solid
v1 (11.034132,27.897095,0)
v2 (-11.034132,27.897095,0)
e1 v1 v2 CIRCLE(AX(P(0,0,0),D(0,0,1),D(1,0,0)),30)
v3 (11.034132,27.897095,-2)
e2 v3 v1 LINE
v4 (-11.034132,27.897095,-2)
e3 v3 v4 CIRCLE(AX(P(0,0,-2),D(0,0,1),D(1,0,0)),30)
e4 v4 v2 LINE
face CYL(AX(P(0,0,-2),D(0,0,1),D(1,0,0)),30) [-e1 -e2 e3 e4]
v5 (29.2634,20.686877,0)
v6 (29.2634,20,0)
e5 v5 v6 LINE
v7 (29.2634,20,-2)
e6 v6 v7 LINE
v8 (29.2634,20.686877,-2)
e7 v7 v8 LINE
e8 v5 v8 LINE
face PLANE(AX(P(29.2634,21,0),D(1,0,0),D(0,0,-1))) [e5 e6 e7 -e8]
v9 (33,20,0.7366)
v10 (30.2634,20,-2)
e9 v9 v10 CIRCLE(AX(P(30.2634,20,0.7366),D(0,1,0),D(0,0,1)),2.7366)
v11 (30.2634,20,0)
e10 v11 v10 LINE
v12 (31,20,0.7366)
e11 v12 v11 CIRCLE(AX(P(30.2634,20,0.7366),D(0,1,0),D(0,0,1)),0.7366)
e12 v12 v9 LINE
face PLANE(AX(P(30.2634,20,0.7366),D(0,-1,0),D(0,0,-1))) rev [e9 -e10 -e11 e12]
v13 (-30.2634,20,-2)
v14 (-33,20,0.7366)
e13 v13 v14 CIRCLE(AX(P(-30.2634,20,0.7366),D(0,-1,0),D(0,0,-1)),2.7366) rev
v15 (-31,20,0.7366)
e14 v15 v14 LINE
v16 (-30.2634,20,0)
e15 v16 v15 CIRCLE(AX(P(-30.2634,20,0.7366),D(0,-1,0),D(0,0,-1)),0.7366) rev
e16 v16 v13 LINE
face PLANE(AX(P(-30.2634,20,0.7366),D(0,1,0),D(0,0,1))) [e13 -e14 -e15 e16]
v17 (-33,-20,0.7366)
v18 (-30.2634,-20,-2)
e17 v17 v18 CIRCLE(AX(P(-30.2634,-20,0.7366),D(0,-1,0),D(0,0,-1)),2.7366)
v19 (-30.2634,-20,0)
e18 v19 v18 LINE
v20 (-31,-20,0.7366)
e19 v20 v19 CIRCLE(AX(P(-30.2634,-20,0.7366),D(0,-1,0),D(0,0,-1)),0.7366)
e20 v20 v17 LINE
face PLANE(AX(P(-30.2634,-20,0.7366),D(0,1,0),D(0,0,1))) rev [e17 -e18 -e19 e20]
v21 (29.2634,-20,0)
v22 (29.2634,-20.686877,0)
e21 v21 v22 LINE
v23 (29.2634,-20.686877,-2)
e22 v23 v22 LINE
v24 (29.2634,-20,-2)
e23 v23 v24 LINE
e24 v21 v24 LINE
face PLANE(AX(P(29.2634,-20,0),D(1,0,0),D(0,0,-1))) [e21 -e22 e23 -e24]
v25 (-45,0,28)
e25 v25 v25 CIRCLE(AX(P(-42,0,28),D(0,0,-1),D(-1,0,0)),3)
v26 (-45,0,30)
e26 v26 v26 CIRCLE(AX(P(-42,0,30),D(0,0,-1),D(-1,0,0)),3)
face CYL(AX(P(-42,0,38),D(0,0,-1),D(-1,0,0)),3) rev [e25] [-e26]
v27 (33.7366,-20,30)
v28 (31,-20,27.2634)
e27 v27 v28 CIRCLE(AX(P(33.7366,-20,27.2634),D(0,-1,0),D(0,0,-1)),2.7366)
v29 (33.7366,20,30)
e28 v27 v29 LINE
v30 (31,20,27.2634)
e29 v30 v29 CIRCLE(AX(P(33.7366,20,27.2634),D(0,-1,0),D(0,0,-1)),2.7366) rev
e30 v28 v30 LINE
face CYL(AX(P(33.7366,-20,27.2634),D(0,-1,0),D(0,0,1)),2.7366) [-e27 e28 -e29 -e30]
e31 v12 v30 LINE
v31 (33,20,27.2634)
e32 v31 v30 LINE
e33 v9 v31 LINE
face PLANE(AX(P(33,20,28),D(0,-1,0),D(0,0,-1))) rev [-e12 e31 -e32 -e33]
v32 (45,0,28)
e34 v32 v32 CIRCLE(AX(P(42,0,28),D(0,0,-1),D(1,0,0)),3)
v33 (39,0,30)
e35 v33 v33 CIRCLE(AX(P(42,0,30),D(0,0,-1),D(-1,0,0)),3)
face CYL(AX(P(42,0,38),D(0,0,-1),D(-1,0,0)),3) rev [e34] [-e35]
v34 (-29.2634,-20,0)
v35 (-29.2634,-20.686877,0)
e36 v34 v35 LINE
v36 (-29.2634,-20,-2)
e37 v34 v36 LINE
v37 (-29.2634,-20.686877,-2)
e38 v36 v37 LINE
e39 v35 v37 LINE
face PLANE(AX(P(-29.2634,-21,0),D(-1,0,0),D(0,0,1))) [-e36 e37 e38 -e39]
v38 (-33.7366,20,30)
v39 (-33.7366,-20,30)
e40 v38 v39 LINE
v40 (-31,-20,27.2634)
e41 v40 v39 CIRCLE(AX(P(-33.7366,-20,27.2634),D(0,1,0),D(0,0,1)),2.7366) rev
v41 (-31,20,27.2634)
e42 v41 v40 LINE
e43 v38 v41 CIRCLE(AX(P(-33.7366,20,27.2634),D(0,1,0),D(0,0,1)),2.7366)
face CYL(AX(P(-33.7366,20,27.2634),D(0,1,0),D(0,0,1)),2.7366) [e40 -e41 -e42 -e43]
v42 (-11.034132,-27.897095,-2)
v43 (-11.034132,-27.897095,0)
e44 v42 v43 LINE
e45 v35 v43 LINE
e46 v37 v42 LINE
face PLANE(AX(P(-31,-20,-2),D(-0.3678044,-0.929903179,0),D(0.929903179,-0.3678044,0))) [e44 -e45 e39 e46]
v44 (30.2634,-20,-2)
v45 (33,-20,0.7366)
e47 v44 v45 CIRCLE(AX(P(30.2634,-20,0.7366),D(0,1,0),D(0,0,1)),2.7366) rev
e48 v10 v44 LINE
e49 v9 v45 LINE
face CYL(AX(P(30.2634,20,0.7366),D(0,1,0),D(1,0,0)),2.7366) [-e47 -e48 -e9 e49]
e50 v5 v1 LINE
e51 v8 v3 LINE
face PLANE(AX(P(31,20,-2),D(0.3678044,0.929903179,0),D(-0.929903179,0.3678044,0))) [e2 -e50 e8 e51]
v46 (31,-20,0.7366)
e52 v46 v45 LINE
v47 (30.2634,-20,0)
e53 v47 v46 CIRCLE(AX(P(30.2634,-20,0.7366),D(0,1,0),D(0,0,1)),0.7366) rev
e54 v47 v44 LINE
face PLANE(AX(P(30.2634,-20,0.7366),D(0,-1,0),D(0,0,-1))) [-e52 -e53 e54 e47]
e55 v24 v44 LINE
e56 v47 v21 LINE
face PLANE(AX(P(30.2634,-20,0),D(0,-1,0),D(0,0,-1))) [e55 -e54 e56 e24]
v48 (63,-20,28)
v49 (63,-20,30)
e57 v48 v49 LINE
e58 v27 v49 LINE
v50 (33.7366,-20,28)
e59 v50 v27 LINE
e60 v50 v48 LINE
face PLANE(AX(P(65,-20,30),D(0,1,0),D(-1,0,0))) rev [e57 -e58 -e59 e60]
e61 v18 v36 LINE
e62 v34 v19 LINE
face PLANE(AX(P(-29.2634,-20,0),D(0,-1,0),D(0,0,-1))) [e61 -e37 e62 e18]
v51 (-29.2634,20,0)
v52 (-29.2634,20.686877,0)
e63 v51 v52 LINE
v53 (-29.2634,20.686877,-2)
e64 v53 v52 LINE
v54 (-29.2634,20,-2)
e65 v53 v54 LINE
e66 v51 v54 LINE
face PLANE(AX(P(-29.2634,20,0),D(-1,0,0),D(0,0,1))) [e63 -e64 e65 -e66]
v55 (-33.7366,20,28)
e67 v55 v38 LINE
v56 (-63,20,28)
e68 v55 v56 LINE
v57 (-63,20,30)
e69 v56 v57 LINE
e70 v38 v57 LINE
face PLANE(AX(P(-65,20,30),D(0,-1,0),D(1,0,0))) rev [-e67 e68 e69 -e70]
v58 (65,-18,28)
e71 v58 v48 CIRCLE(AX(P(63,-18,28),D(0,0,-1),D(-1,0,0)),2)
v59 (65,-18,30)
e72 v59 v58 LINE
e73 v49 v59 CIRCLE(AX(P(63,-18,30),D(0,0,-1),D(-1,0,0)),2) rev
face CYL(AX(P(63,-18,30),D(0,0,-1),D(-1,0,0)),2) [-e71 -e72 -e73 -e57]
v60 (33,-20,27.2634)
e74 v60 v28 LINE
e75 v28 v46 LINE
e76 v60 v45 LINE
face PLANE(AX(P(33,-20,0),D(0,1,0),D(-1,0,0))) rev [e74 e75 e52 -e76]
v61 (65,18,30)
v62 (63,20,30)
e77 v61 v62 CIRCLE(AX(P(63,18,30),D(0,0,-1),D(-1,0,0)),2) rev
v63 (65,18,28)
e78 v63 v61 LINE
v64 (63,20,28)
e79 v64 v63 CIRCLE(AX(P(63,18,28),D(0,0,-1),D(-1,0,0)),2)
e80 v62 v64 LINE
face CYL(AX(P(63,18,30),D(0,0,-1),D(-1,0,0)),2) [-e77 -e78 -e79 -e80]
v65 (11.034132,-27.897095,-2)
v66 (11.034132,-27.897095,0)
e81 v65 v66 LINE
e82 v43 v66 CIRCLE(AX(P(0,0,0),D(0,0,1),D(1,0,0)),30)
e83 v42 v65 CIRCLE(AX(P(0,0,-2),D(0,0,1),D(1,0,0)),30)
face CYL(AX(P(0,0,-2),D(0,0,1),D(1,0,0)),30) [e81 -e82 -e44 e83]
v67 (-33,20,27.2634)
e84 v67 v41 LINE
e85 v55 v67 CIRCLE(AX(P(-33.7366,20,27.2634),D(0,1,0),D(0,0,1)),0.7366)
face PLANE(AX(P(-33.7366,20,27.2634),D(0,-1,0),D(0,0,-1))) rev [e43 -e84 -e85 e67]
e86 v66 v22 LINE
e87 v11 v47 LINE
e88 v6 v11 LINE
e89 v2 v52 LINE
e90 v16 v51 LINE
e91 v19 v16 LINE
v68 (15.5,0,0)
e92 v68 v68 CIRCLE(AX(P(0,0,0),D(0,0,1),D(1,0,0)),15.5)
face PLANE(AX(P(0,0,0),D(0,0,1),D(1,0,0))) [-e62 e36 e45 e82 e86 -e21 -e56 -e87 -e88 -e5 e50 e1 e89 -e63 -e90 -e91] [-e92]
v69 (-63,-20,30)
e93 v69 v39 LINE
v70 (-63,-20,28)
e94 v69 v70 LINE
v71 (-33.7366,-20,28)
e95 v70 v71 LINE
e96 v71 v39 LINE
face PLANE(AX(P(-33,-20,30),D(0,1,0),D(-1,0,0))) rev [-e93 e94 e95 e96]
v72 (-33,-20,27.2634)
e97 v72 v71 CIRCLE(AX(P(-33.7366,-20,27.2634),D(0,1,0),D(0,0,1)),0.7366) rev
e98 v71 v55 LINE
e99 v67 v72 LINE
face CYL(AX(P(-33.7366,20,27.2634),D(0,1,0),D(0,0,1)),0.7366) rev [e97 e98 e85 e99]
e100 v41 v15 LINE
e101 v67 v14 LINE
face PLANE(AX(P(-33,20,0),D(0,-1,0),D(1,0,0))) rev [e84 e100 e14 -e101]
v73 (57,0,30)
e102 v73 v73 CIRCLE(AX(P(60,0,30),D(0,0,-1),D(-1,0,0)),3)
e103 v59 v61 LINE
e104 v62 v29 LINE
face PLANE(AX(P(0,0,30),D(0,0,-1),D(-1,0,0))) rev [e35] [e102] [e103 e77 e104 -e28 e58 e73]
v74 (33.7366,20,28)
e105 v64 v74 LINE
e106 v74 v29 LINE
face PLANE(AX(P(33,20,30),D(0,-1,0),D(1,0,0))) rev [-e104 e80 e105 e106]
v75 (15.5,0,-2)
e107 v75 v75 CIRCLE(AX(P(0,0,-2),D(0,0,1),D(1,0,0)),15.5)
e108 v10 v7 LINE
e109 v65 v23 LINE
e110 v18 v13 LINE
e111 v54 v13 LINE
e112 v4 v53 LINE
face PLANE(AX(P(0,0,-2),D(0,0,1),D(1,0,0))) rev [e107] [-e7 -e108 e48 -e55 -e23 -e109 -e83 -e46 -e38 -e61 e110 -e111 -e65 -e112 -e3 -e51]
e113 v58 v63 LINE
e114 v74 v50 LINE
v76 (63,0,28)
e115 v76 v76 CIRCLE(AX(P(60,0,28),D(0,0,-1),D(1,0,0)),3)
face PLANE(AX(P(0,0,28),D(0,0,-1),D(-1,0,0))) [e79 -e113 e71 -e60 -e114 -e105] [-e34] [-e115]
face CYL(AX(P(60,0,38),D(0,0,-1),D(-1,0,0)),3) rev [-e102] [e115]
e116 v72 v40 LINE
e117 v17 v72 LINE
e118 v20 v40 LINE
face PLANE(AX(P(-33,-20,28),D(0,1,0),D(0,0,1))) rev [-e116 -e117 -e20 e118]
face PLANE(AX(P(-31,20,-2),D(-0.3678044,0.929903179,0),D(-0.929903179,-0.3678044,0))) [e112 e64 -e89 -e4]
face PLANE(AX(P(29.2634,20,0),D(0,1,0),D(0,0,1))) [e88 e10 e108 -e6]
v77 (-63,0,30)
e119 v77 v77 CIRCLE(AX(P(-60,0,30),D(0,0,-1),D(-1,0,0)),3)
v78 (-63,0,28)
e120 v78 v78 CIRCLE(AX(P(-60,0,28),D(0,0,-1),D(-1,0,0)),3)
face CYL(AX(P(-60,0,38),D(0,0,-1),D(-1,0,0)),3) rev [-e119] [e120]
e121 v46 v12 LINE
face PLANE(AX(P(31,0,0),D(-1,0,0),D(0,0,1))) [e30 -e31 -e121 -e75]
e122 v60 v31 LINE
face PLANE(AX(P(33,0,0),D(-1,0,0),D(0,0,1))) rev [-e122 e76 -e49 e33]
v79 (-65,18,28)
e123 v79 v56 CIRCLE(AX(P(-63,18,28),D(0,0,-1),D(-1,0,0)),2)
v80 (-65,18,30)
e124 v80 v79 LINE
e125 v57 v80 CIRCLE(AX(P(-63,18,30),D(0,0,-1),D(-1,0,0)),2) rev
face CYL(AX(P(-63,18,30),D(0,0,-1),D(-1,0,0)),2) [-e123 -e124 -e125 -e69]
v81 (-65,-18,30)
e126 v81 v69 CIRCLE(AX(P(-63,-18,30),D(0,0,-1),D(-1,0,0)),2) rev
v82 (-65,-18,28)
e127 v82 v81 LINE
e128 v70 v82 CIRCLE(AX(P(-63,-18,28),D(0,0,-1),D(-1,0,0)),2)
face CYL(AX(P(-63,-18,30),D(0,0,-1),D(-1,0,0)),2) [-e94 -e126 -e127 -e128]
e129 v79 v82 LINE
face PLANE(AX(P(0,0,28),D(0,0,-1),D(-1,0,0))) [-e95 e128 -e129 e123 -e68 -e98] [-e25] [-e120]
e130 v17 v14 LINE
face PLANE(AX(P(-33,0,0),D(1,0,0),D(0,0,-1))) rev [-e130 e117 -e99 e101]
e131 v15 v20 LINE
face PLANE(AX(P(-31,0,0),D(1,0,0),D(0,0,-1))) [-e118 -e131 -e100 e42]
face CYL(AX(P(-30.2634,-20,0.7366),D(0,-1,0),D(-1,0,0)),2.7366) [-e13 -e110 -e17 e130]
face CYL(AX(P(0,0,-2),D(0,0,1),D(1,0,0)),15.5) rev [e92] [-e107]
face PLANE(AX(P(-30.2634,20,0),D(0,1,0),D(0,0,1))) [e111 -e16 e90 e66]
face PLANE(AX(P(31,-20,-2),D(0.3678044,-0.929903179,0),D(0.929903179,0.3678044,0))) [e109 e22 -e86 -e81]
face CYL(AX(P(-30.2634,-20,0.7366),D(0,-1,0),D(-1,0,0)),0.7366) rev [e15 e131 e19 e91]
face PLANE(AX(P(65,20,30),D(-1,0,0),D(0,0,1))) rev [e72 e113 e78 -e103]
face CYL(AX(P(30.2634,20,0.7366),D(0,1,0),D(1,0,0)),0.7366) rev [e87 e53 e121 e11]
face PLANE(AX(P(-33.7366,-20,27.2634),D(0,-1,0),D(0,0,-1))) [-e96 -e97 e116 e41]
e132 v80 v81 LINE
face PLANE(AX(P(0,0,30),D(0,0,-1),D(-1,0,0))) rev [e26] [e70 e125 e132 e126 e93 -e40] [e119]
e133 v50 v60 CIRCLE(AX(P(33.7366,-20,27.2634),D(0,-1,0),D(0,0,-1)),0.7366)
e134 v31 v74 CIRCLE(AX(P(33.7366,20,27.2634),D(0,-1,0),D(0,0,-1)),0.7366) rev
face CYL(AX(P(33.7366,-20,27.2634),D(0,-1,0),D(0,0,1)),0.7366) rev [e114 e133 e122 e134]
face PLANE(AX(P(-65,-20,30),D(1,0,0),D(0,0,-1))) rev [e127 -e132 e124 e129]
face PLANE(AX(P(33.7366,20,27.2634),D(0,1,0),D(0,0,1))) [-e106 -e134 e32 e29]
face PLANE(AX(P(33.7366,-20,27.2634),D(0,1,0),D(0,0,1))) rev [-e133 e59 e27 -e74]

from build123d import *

# Parameters (mm, degrees)
SKETCH1_R                       = 15.5
BASE_FLANGE1_DEPTH              = 2
EDGE_FLANGE1_STRIP_W            = 9.4732
EDGE_FLANGE1_STRIP_H            = 2
EDGE_FLANGE1_STRIP_CUT_DEPTH    = 40
EDGE_FLANGE1_RELIEF_W           = 10.4732
EDGE_FLANGE1_RELIEF_H           = 1
EDGE_FLANGE1_RELIEF_CUT_DEPTH   = 2
EDGE_FLANGE1_STRIP_2_W          = 9.4732
EDGE_FLANGE1_STRIP_2_H          = 2
EDGE_FLANGE1_STRIP_CUT_2_DEPTH  = 40
EDGE_FLANGE1_RELIEF_2_W         = 10.4732
EDGE_FLANGE1_RELIEF_2_H         = 1
EDGE_FLANGE1_RELIEF_CUT_2_DEPTH = 2
EDGE_FLANGE1_DEPTH              = 40
EDGE_FLANGE1_BEND_DEPTH         = 40
EDGE_FLANGE2_STRIP_W            = 9.4732
EDGE_FLANGE2_STRIP_H            = 2
EDGE_FLANGE2_STRIP_CUT_DEPTH    = 40
EDGE_FLANGE2_STRIP_2_W          = 9.4732
EDGE_FLANGE2_STRIP_2_H          = 2
EDGE_FLANGE2_STRIP_CUT_2_DEPTH  = 40
EDGE_FLANGE2_DEPTH              = 40
EDGE_FLANGE2_BEND_DEPTH         = 40
SKETCH17_R                      = 3
CUT_EXTRUDE1_DEPTH              = 10
FILLET1_R                       = 2


# Sheet-metal steps are written as plain solids
with BuildPart() as part:
    # Sketch1 → Base-Flange1 (new body)
    with BuildSketch(Plane.XY):
        with BuildLine():
            Line((-31, 20), (-11.034132012, 27.897095382))
            ThreePointArc((-11.034132012, 27.897095382), (0, 30), (11.034132012, 27.897095382))
            Line((11.034132012, 27.897095382), (31, 20))
            Line((31, 20), (31, -20))
            Line((31, -20), (11.034132012, -27.897095382))
            ThreePointArc((11.034132012, -27.897095382), (0, -30), (-11.034132012, -27.897095382))
            Line((-11.034132012, -27.897095382), (-31, -20))
            Line((-31, -20), (-31, 20))
        make_face()
        Circle(SKETCH1_R, mode=Mode.SUBTRACT)
    extrude(amount=-BASE_FLANGE1_DEPTH)

    # Edge-Flange1 strip (across the edge) → Edge-Flange1 strip cut (cut)
    with BuildSketch(Plane(origin=(-31, 20, 0), x_dir=(1, 0, 0), z_dir=(0, -1, 0))):
        with Locations((-4, -1)):
            Rectangle(EDGE_FLANGE1_STRIP_W, EDGE_FLANGE1_STRIP_H)
    extrude(amount=EDGE_FLANGE1_STRIP_CUT_DEPTH, mode=Mode.SUBTRACT)

    # Edge-Flange1 relief (on the sheet) → Edge-Flange1 relief cut (cut)
    with BuildSketch(Plane(origin=(-30.2634, 20, 0), x_dir=(1, 0, 0), z_dir=(0, 0, 1))):
        with Locations((-4.2366, 0.5)):
            Rectangle(EDGE_FLANGE1_RELIEF_W, EDGE_FLANGE1_RELIEF_H)
        with Locations((-4.2366, -40.5)):
            Rectangle(EDGE_FLANGE1_RELIEF_W, EDGE_FLANGE1_RELIEF_H)
    extrude(amount=-EDGE_FLANGE1_RELIEF_CUT_DEPTH, mode=Mode.SUBTRACT)

    # Edge-Flange1 strip 2 (across the edge) → Edge-Flange1 strip cut 2 (cut)
    with BuildSketch(Plane(origin=(31, -20, 0), x_dir=(-1, 0, 0), z_dir=(0, 1, 0))):
        with Locations((-4, -1)):
            Rectangle(EDGE_FLANGE1_STRIP_2_W, EDGE_FLANGE1_STRIP_2_H)
    extrude(amount=EDGE_FLANGE1_STRIP_CUT_2_DEPTH, mode=Mode.SUBTRACT)

    # Edge-Flange1 relief 2 (on the sheet) → Edge-Flange1 relief cut 2 (cut)
    with BuildSketch(Plane(origin=(30.2634, -20, 0), x_dir=(-1, 0, 0), z_dir=(0, 0, 1))):
        with Locations((-4.2366, 0.5)):
            Rectangle(EDGE_FLANGE1_RELIEF_2_W, EDGE_FLANGE1_RELIEF_2_H)
        with Locations((-4.2366, -40.5)):
            Rectangle(EDGE_FLANGE1_RELIEF_2_W, EDGE_FLANGE1_RELIEF_2_H)
    extrude(amount=-EDGE_FLANGE1_RELIEF_CUT_2_DEPTH, mode=Mode.SUBTRACT)

    # Edge-Flange1 section (across the edge) → Edge-Flange1 (add)
    with BuildSketch(Plane(origin=(-31, 20, 0), x_dir=(1, 0, 0), z_dir=(0, -1, 0))):
        with BuildLine():
            Line((-2, 0.7366), (-2, 28))
            Line((-2, 28), (0, 28))
            Line((0, 28), (0, 0.7366))
            ThreePointArc((0, 0.7366), (0.215745145, 0.215745145), (0.7366, 0))
            Line((0.7366, 0), (0.7366, -2))
            ThreePointArc((0.7366, -2), (-1.198468417, -1.198468417), (-2, 0.7366))
        make_face()
    extrude(amount=EDGE_FLANGE1_DEPTH)

    # Edge-Flange1 section 2 (across the edge) → Edge-Flange1 bend (add)
    with BuildSketch(Plane(origin=(31, -20, 0), x_dir=(-1, 0, 0), z_dir=(0, 1, 0))):
        with BuildLine():
            Line((-2, 0.7366), (-2, 28))
            Line((-2, 28), (0, 28))
            Line((0, 28), (0, 0.7366))
            ThreePointArc((0, 0.7366), (0.215745145, 0.215745145), (0.7366, 0))
            Line((0.7366, 0), (0.7366, -2))
            ThreePointArc((0.7366, -2), (-1.198468417, -1.198468417), (-2, 0.7366))
        make_face()
    extrude(amount=EDGE_FLANGE1_BEND_DEPTH)

    # Edge-Flange2 strip (across the edge) → Edge-Flange2 strip cut (cut)
    with BuildSketch(Plane(origin=(-33, -20, 28), x_dir=(0, 0, -1), z_dir=(0, 1, 0))):
        with Locations((-4, -1)):
            Rectangle(EDGE_FLANGE2_STRIP_W, EDGE_FLANGE2_STRIP_H)
    extrude(amount=EDGE_FLANGE2_STRIP_CUT_DEPTH, mode=Mode.SUBTRACT)

    # Edge-Flange2 strip 2 (across the edge) → Edge-Flange2 strip cut 2 (cut)
    with BuildSketch(Plane(origin=(33, 20, 28), x_dir=(0, 0, -1), z_dir=(0, -1, 0))):
        with Locations((-4, -1)):
            Rectangle(EDGE_FLANGE2_STRIP_2_W, EDGE_FLANGE2_STRIP_2_H)
    extrude(amount=EDGE_FLANGE2_STRIP_CUT_2_DEPTH, mode=Mode.SUBTRACT)

    # Edge-Flange2 section (across the edge) → Edge-Flange2 (add)
    with BuildSketch(Plane(origin=(-33, -20, 28), x_dir=(0, 0, -1), z_dir=(0, 1, 0))):
        with BuildLine():
            Line((-2, 0.7366), (-2, 32))
            Line((-2, 32), (0, 32))
            Line((0, 32), (0, 0.7366))
            ThreePointArc((0, 0.7366), (0.215745145, 0.215745145), (0.7366, 0))
            Line((0.7366, 0), (0.7366, -2))
            ThreePointArc((0.7366, -2), (-1.198468417, -1.198468417), (-2, 0.7366))
        make_face()
    extrude(amount=EDGE_FLANGE2_DEPTH)

    # Edge-Flange2 section 2 (across the edge) → Edge-Flange2 bend (add)
    with BuildSketch(Plane(origin=(33, 20, 28), x_dir=(0, 0, -1), z_dir=(0, -1, 0))):
        with BuildLine():
            Line((-2, 0.7366), (-2, 32))
            Line((-2, 32), (0, 32))
            Line((0, 32), (0, 0.7366))
            ThreePointArc((0, 0.7366), (0.215745145, 0.215745145), (0.7366, 0))
            Line((0.7366, 0), (0.7366, -2))
            ThreePointArc((0.7366, -2), (-1.198468417, -1.198468417), (-2, 0.7366))
        make_face()
    extrude(amount=EDGE_FLANGE2_BEND_DEPTH)

    # Sketch17 → Cut-Extrude1 (cut)
    with BuildSketch(Plane(origin=(0, 0, 28), x_dir=(-1, 0, 0), z_dir=(0, 0, -1))):
        with Locations((60, 0)):
            Circle(SKETCH17_R)
        with Locations((42, 0)):
            Circle(SKETCH17_R)
        with Locations((-60, 0)):
            Circle(SKETCH17_R)
        with Locations((-42, 0)):
            Circle(SKETCH17_R)
    extrude(amount=-CUT_EXTRUDE1_DEPTH, mode=Mode.SUBTRACT)

    # Fillet1
    fillet1_edges = [part.edges().sort_by_distance(p)[0] for p in [
        (-65, -20, 29),
        (-65, 20, 29),
        (65, 20, 29),
        (65, -20, 29),
    ]]
    fillet(fillet1_edges, radius=FILLET1_R)


solid = part.part
